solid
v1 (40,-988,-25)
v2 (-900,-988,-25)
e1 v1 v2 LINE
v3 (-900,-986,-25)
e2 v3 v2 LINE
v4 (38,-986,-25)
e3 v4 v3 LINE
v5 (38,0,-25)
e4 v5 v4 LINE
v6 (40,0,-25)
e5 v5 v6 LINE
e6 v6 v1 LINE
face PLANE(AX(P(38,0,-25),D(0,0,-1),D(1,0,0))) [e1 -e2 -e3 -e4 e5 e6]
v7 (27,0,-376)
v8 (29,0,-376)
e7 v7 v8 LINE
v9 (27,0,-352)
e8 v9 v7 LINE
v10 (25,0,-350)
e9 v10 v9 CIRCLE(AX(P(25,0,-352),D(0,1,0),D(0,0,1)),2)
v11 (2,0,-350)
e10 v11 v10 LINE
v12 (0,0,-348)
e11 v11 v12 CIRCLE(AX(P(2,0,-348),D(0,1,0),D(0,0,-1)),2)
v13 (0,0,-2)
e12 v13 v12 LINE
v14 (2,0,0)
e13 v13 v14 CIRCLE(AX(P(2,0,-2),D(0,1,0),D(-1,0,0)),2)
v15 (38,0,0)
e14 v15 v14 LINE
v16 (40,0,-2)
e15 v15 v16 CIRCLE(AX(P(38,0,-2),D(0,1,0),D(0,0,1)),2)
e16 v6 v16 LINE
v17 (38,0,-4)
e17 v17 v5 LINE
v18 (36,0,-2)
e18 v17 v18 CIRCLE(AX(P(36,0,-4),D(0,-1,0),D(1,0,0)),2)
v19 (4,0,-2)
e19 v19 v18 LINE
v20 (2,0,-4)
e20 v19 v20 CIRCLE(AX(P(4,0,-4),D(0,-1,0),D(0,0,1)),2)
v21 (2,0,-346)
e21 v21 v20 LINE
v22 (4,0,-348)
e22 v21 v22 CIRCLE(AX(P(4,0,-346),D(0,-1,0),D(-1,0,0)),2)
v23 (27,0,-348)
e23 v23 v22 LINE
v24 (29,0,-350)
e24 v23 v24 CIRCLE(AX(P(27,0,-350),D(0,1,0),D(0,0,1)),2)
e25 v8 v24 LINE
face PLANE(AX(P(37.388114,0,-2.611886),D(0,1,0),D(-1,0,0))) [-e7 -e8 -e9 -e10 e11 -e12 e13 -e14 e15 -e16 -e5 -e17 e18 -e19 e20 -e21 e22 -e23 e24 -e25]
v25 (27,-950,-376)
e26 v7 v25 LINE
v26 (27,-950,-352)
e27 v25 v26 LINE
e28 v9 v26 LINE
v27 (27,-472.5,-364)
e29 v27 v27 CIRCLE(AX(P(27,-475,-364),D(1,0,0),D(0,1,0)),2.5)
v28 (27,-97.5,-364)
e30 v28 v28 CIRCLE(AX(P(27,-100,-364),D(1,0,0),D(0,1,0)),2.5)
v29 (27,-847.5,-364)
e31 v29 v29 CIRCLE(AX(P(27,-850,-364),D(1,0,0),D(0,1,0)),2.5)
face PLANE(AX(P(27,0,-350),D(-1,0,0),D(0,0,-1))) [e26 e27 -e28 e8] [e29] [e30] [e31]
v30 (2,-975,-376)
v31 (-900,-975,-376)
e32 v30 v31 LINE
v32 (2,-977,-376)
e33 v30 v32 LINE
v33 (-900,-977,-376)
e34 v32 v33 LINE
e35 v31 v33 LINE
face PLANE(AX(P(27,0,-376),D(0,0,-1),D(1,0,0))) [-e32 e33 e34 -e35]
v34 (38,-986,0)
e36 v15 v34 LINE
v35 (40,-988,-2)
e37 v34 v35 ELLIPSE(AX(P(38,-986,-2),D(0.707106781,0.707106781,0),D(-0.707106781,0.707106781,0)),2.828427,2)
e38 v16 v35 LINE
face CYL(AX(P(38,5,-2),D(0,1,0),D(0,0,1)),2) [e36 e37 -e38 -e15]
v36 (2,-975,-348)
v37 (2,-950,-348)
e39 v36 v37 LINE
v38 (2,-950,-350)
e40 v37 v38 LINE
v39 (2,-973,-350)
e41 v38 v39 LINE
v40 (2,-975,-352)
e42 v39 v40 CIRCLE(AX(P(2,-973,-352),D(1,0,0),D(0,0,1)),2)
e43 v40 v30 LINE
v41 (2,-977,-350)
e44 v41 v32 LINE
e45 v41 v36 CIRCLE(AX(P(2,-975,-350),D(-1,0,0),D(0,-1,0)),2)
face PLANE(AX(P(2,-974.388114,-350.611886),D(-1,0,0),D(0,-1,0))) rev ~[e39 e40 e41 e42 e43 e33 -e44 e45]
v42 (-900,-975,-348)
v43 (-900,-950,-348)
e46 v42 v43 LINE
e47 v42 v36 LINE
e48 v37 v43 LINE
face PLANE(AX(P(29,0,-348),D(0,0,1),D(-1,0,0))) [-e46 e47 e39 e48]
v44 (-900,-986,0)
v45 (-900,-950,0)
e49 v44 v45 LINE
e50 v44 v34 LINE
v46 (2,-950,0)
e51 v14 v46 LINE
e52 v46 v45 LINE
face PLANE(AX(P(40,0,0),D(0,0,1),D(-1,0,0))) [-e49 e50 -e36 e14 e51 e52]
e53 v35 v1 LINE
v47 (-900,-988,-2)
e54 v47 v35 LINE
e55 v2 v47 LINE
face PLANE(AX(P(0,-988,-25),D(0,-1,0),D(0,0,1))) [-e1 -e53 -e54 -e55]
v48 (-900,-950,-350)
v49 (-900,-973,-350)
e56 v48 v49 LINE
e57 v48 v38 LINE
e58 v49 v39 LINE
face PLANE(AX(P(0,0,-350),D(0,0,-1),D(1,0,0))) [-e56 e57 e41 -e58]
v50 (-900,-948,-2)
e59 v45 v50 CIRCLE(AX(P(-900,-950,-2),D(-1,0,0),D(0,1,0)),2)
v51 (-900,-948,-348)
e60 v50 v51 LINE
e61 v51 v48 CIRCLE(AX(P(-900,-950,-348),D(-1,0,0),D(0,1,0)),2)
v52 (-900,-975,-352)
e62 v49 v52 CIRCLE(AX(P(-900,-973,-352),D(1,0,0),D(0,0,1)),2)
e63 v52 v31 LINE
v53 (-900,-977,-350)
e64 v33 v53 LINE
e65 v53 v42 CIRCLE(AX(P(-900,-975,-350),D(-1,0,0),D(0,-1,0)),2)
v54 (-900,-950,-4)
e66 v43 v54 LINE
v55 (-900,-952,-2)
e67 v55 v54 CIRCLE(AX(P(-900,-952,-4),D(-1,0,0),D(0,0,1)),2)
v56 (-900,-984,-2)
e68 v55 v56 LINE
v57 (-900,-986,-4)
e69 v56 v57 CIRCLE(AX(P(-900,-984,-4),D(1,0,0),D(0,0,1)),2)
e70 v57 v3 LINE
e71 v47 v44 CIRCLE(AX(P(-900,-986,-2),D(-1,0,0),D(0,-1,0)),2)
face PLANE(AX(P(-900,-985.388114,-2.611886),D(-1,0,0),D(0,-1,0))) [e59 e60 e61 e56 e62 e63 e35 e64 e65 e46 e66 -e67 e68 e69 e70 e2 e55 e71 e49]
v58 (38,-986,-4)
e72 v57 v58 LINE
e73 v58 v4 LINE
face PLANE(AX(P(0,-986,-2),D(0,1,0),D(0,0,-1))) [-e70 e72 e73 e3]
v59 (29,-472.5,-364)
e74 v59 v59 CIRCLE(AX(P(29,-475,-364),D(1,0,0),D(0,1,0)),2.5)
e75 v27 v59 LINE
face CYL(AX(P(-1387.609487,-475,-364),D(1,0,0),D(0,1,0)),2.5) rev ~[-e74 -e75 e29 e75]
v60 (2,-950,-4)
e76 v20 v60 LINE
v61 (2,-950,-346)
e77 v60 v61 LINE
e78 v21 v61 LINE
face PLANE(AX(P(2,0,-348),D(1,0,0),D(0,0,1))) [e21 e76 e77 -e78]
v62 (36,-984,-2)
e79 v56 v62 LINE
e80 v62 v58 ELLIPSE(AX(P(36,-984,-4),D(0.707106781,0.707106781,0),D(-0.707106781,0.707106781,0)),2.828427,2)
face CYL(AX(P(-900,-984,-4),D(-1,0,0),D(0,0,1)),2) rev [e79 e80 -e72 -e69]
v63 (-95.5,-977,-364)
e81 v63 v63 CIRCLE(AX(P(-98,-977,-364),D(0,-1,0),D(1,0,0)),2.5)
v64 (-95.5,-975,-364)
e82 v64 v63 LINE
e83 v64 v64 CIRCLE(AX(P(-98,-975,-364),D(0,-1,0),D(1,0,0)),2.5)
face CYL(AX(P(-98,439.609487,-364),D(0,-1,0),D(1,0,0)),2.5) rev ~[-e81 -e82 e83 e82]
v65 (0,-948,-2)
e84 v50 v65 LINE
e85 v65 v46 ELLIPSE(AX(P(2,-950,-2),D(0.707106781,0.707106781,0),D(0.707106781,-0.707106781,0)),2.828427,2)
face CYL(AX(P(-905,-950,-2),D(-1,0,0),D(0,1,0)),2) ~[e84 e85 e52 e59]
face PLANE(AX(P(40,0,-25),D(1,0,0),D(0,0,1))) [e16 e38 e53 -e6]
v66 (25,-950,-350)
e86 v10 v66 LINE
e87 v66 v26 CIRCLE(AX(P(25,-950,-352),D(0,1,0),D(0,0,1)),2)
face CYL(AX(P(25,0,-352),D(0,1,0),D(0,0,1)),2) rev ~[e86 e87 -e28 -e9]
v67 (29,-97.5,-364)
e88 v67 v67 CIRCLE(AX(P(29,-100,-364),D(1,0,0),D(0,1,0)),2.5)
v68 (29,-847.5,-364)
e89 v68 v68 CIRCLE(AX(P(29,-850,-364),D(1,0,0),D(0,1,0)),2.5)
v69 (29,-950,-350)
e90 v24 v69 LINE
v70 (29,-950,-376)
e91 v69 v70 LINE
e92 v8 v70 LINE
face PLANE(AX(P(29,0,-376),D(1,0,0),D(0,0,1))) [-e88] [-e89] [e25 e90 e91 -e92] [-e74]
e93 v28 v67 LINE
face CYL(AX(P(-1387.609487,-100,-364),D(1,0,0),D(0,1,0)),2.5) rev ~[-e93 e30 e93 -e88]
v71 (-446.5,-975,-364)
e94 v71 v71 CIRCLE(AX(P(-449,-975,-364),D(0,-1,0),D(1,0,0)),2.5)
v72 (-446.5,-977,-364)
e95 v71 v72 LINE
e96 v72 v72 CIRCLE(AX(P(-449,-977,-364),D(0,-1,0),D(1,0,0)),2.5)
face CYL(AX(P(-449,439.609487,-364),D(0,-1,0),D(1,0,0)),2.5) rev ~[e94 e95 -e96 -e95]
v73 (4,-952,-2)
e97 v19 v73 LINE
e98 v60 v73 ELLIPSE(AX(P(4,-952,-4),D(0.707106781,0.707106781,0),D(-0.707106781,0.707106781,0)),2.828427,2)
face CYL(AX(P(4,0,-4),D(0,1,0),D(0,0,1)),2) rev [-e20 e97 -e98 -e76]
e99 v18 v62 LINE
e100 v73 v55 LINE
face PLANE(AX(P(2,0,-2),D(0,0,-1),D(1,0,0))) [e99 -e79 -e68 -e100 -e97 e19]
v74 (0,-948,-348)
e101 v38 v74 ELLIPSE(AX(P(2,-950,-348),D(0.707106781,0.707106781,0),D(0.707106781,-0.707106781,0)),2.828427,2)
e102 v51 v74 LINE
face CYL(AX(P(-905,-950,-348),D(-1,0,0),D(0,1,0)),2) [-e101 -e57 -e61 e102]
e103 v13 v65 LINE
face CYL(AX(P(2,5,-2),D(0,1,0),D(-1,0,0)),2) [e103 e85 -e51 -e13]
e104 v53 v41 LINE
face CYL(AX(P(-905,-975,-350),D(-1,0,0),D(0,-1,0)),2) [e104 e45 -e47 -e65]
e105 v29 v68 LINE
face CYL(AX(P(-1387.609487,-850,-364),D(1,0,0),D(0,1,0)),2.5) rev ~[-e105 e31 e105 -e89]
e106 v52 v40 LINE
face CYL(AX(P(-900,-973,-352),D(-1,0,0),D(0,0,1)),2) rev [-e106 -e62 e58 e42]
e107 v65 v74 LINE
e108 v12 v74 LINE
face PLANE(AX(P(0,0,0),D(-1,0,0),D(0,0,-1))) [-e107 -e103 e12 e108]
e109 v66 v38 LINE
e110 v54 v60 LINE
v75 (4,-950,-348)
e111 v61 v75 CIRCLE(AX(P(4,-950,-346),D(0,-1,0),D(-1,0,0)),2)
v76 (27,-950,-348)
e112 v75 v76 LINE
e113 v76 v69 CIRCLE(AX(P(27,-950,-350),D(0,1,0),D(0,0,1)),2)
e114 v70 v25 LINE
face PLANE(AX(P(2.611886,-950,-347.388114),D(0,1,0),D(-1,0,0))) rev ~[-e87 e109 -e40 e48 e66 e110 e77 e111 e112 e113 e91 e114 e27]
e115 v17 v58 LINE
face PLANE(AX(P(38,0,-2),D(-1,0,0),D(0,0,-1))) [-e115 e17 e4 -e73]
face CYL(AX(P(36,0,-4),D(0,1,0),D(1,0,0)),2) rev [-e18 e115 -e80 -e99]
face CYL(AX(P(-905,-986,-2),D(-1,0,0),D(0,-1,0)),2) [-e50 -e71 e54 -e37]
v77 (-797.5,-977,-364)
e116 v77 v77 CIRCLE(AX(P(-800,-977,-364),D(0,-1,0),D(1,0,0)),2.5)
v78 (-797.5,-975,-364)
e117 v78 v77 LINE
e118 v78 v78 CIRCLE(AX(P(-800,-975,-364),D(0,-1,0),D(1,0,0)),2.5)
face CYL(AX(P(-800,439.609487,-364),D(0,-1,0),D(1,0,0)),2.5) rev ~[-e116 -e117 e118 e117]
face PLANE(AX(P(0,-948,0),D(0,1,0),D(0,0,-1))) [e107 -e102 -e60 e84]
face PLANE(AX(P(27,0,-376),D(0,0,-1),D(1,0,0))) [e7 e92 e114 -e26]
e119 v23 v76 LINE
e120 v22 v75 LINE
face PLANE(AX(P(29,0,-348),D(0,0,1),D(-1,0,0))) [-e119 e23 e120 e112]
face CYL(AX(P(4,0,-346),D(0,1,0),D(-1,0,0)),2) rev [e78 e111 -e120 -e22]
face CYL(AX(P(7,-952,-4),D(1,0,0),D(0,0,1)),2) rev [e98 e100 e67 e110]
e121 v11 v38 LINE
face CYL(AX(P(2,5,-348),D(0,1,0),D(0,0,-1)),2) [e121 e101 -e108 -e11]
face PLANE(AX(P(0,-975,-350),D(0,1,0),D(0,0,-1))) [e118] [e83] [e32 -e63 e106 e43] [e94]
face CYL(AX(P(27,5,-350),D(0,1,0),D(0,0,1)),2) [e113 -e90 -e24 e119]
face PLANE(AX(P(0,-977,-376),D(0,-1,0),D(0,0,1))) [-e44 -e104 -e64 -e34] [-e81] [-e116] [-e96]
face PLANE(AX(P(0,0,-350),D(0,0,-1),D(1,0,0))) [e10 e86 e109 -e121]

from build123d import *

# Parameters (mm, degrees)
F3_W         = 27
F3_H         = 27
F4_DEPTH     = 30
F5_T1_DEPTH  = 950
F5_T3_DEPTH  = 986
F5_T5_DEPTH  = 902
F5_T7_DEPTH  = 938
F5_T13_DEPTH = 955
F5_T17_DEPTH = 907
F5_T20_DEPTH = 960
F5_T22_DEPTH = 998
F5_T24_DEPTH = 953
F5_T26_DEPTH = 950
F5_T28_DEPTH = 905
F5_T30_DEPTH = 912
F5_T36_DEPTH = 910
F5_T40_DEPTH = 958
F5_T47_DEPTH = 910
F5_T51_DEPTH = 958
F8_D         = 5
F8_ON_F6_D   = 5


# Not quite as in the source:
# - a fillet or chamfer that OpenCascade refuses, or shapes differently, is made with other operations: its cross-section is extruded or revolved along the edge and cut away or added


with BuildPart() as f2:
    # F2: sweep along a path in F1
    with BuildLine(Plane.XY) as f2_path:
        Line((0, 0), (0, -948))
        Line((0, -948), (-900, -948))
    # F0 (on Front) → F2 (sweep)
    with BuildSketch(Plane.XZ):
        Polygon((38, -2), (38, -25), (40, -25), (40, 0), (0, 0), (0, -350), (27, -350), (27, -376), (29, -376), (29, -348), (2, -348), (2, -2), align=None)
    sweep(path=f2_path.line, transition=Transition.RIGHT)

    # F3 (on face) → F4 (cut)
    with BuildSketch(Plane.XY.offset(-348)):
        with Locations((15.5, -963.5)):
            Rectangle(F3_W, F3_H)
    extrude(amount=-F4_DEPTH, mode=Mode.SUBTRACT)

    # F5: fillet of radius 2 on 15 edges, made by hand

    # F5_s2 → F5_t1 (join)
    with BuildSketch(Plane.XZ):
        with BuildLine():
            ThreePointArc((2, -346), (2.5857864376, -347.4142135624), (4, -348))
            Line((4, -348), (2, -348))
            Line((2, -348), (2, -346))
        make_face()
        with BuildLine():
            ThreePointArc((25, -350), (26.4142135624, -350.5857864376), (27, -352))
            Line((27, -352), (27, -350))
            Line((27, -350), (25, -350))
        make_face()
        with BuildLine():
            ThreePointArc((4, -2), (2.5857864376, -2.5857864376), (2, -4))
            Line((2, -4), (2, -2))
            Line((2, -2), (4, -2))
        make_face()
    extrude(amount=F5_T1_DEPTH)

    # F5_s4 → F5_t3 (join)
    with BuildSketch(Plane.XZ):
        with BuildLine():
            ThreePointArc((38, -4), (37.4142135624, -2.5857864376), (36, -2))
            Line((36, -2), (38, -2))
            Line((38, -2), (38, -4))
        make_face()
    extrude(amount=F5_T3_DEPTH)

    # F5_s6 → F5_t5 (join)
    with BuildSketch(Plane.YZ.offset(-900)):
        with BuildLine():
            ThreePointArc((-973, -350), (-974.4142135624, -350.5857864376), (-975, -352))
            Line((-975, -352), (-975, -350))
            Line((-975, -350), (-973, -350))
        make_face()
        with BuildLine():
            ThreePointArc((-952, -2), (-950.5857864376, -2.5857864376), (-950, -4))
            Line((-950, -4), (-950, -2))
            Line((-950, -2), (-952, -2))
        make_face()
    extrude(amount=F5_T5_DEPTH)

    # F5_s8 → F5_t7 (join)
    with BuildSketch(Plane.YZ.offset(-900)):
        with BuildLine():
            ThreePointArc((-984, -2), (-985.4142135624, -2.5857864376), (-986, -4))
            Line((-986, -4), (-986, -2))
            Line((-986, -2), (-984, -2))
        make_face()
    extrude(amount=F5_T7_DEPTH)


with BuildPart() as f5_tool11:
    # F5_s12 → F5_t13 (new body)
    with BuildSketch(Plane.XZ):
        with BuildLine():
            ThreePointArc((4, -2), (2.5857864376, -2.5857864376), (2, -4))
            Line((2, -4), (2, -2))
            Line((2, -2), (4, -2))
        make_face()
    extrude(amount=F5_T13_DEPTH)

    split(bisect_by=Plane.XZ.offset(950), keep=Keep.TOP)


with BuildPart() as f5_tool15:
    # F5_s16 → F5_t17 (new body)
    with BuildSketch(Plane.YZ.offset(7)):
        with BuildLine():
            ThreePointArc((-952, -2), (-950.5857864376, -2.5857864376), (-950, -4))
            Line((-950, -4), (-950, -2))
            Line((-950, -2), (-952, -2))
        make_face()
    extrude(amount=-F5_T17_DEPTH)

    split(bisect_by=Plane.YZ.offset(2), keep=Keep.TOP)


with BuildPart() as f5_tool11_1:
    add(f5_tool11.part)

    # F5_t19: intersect F5_tool15
    add(f5_tool15.part, mode=Mode.INTERSECT)


with BuildPart() as f2_1:
    add(f2.part)

    # F5_t9: union F5_tool11
    add(f5_tool11_1.part)

    # F5_s21 → F5_t20 (cut)
    with BuildSketch(Plane.XZ.offset(-5)):
        with BuildLine():
            ThreePointArc((27, -348), (28.4142135624, -348.5857864376), (29, -350))
            Line((29, -350), (29, -348))
            Line((29, -348), (27, -348))
        make_face()
    extrude(amount=F5_T20_DEPTH, mode=Mode.SUBTRACT)

    # F5_s23 → F5_t22 (cut)
    with BuildSketch(Plane.XZ.offset(-5)):
        with BuildLine():
            ThreePointArc((38, 0), (39.4142135624, -0.5857864376), (40, -2))
            Line((40, -2), (40, 0))
            Line((40, 0), (38, 0))
        make_face()
    extrude(amount=F5_T22_DEPTH, mode=Mode.SUBTRACT)

    # F5_s25 → F5_t24 (cut)
    with BuildSketch(Plane.XZ.offset(-5)):
        with BuildLine():
            ThreePointArc((0, -2), (0.5857864376, -0.5857864376), (2, 0))
            Line((2, 0), (0, 0))
            Line((0, 0), (0, -2))
        make_face()
        with BuildLine():
            ThreePointArc((2, -350), (0.5857864376, -349.4142135624), (0, -348))
            Line((0, -348), (0, -350))
            Line((0, -350), (2, -350))
        make_face()
    extrude(amount=F5_T24_DEPTH, mode=Mode.SUBTRACT)

    # F5_s27 → F5_t26 (cut)
    with BuildSketch(Plane.YZ.offset(-905)):
        with BuildLine():
            ThreePointArc((-988, -2), (-987.4142135624, -0.5857864376), (-986, 0))
            Line((-986, 0), (-988, 0))
            Line((-988, 0), (-988, -2))
        make_face()
    extrude(amount=F5_T26_DEPTH, mode=Mode.SUBTRACT)

    # F5_s29 → F5_t28 (cut)
    with BuildSketch(Plane.YZ.offset(-905)):
        with BuildLine():
            ThreePointArc((-948, -2), (-948.5857864376, -0.5857864376), (-950, 0))
            Line((-950, 0), (-948, 0))
            Line((-948, 0), (-948, -2))
        make_face()
        with BuildLine():
            ThreePointArc((-948, -348), (-948.5857864376, -349.4142135624), (-950, -350))
            Line((-950, -350), (-948, -350))
            Line((-948, -350), (-948, -348))
        make_face()
    extrude(amount=F5_T28_DEPTH, mode=Mode.SUBTRACT)

    # F5_s31 → F5_t30 (cut)
    with BuildSketch(Plane.YZ.offset(-905)):
        with BuildLine():
            ThreePointArc((-977, -350), (-976.4142135624, -348.5857864376), (-975, -348))
            Line((-975, -348), (-977, -348))
            Line((-977, -348), (-977, -350))
        make_face()
    extrude(amount=F5_T30_DEPTH, mode=Mode.SUBTRACT)


with BuildPart() as f5_tool34:
    # F5_s35 → F5_t36 (new body)
    with BuildSketch(Plane.YZ.offset(5)):
        with BuildLine():
            ThreePointArc((-948, -2), (-948.5857864376, -0.5857864376), (-950, 0))
            Line((-950, 0), (-948, 0))
            Line((-948, 0), (-948, -2))
        make_face()
    extrude(amount=-F5_T36_DEPTH)

    split(bisect_by=Plane.YZ, keep=Keep.TOP)


with BuildPart() as f5_tool38:
    # F5_s39 → F5_t40 (new body)
    with BuildSketch(Plane.XZ.offset(-5)):
        with BuildLine():
            ThreePointArc((0, -2), (0.5857864376, -0.5857864376), (2, 0))
            Line((2, 0), (0, 0))
            Line((0, 0), (0, -2))
        make_face()
    extrude(amount=F5_T40_DEPTH)

    split(bisect_by=Plane.XZ.offset(948), keep=Keep.TOP)


with BuildPart() as f5_tool34_1:
    add(f5_tool34.part)

    # F5_t42: intersect F5_tool38
    add(f5_tool38.part, mode=Mode.INTERSECT)


with BuildPart() as f2_2:
    add(f2_1.part)

    # F5_t32: cut F5_tool34
    add(f5_tool34_1.part, mode=Mode.SUBTRACT)


with BuildPart() as f5_tool45:
    # F5_s46 → F5_t47 (new body)
    with BuildSketch(Plane.YZ.offset(5)):
        with BuildLine():
            ThreePointArc((-948, -348), (-948.5857864376, -349.4142135624), (-950, -350))
            Line((-950, -350), (-948, -350))
            Line((-948, -350), (-948, -348))
        make_face()
    extrude(amount=-F5_T47_DEPTH)

    split(bisect_by=Plane.YZ, keep=Keep.TOP)


with BuildPart() as f5_tool49:
    # F5_s50 → F5_t51 (new body)
    with BuildSketch(Plane.XZ.offset(-5)):
        with BuildLine():
            ThreePointArc((2, -350), (0.5857864376, -349.4142135624), (0, -348))
            Line((0, -348), (0, -350))
            Line((0, -350), (2, -350))
        make_face()
    extrude(amount=F5_T51_DEPTH)

    split(bisect_by=Plane.XZ.offset(948), keep=Keep.TOP)


with BuildPart() as f5_tool45_1:
    add(f5_tool45.part)

    # F5_t53: intersect F5_tool49
    add(f5_tool49.part, mode=Mode.INTERSECT)


with BuildPart() as f2_3:
    add(f2_2.part)

    # F5_t43: cut F5_tool45
    add(f5_tool45_1.part, mode=Mode.SUBTRACT)

    # F8 (through all)
    with Locations(Plane(origin=(0, -975, 0), x_dir=(-1, 0, 0), z_dir=(0, 1, 0))):
        with Locations((98, -364), (449, -364), (800, -364)):
            Hole(F8_D / 2)

    # F8 on F6 (through all)
    with Locations(Plane(origin=(27, 0, 0), x_dir=(0, -1, 0), z_dir=(-1, 0, 0))):
        with Locations((100, -364), (475, -364), (850, -364)):
            Hole(F8_ON_F6_D / 2)


solid = f2_3.part
